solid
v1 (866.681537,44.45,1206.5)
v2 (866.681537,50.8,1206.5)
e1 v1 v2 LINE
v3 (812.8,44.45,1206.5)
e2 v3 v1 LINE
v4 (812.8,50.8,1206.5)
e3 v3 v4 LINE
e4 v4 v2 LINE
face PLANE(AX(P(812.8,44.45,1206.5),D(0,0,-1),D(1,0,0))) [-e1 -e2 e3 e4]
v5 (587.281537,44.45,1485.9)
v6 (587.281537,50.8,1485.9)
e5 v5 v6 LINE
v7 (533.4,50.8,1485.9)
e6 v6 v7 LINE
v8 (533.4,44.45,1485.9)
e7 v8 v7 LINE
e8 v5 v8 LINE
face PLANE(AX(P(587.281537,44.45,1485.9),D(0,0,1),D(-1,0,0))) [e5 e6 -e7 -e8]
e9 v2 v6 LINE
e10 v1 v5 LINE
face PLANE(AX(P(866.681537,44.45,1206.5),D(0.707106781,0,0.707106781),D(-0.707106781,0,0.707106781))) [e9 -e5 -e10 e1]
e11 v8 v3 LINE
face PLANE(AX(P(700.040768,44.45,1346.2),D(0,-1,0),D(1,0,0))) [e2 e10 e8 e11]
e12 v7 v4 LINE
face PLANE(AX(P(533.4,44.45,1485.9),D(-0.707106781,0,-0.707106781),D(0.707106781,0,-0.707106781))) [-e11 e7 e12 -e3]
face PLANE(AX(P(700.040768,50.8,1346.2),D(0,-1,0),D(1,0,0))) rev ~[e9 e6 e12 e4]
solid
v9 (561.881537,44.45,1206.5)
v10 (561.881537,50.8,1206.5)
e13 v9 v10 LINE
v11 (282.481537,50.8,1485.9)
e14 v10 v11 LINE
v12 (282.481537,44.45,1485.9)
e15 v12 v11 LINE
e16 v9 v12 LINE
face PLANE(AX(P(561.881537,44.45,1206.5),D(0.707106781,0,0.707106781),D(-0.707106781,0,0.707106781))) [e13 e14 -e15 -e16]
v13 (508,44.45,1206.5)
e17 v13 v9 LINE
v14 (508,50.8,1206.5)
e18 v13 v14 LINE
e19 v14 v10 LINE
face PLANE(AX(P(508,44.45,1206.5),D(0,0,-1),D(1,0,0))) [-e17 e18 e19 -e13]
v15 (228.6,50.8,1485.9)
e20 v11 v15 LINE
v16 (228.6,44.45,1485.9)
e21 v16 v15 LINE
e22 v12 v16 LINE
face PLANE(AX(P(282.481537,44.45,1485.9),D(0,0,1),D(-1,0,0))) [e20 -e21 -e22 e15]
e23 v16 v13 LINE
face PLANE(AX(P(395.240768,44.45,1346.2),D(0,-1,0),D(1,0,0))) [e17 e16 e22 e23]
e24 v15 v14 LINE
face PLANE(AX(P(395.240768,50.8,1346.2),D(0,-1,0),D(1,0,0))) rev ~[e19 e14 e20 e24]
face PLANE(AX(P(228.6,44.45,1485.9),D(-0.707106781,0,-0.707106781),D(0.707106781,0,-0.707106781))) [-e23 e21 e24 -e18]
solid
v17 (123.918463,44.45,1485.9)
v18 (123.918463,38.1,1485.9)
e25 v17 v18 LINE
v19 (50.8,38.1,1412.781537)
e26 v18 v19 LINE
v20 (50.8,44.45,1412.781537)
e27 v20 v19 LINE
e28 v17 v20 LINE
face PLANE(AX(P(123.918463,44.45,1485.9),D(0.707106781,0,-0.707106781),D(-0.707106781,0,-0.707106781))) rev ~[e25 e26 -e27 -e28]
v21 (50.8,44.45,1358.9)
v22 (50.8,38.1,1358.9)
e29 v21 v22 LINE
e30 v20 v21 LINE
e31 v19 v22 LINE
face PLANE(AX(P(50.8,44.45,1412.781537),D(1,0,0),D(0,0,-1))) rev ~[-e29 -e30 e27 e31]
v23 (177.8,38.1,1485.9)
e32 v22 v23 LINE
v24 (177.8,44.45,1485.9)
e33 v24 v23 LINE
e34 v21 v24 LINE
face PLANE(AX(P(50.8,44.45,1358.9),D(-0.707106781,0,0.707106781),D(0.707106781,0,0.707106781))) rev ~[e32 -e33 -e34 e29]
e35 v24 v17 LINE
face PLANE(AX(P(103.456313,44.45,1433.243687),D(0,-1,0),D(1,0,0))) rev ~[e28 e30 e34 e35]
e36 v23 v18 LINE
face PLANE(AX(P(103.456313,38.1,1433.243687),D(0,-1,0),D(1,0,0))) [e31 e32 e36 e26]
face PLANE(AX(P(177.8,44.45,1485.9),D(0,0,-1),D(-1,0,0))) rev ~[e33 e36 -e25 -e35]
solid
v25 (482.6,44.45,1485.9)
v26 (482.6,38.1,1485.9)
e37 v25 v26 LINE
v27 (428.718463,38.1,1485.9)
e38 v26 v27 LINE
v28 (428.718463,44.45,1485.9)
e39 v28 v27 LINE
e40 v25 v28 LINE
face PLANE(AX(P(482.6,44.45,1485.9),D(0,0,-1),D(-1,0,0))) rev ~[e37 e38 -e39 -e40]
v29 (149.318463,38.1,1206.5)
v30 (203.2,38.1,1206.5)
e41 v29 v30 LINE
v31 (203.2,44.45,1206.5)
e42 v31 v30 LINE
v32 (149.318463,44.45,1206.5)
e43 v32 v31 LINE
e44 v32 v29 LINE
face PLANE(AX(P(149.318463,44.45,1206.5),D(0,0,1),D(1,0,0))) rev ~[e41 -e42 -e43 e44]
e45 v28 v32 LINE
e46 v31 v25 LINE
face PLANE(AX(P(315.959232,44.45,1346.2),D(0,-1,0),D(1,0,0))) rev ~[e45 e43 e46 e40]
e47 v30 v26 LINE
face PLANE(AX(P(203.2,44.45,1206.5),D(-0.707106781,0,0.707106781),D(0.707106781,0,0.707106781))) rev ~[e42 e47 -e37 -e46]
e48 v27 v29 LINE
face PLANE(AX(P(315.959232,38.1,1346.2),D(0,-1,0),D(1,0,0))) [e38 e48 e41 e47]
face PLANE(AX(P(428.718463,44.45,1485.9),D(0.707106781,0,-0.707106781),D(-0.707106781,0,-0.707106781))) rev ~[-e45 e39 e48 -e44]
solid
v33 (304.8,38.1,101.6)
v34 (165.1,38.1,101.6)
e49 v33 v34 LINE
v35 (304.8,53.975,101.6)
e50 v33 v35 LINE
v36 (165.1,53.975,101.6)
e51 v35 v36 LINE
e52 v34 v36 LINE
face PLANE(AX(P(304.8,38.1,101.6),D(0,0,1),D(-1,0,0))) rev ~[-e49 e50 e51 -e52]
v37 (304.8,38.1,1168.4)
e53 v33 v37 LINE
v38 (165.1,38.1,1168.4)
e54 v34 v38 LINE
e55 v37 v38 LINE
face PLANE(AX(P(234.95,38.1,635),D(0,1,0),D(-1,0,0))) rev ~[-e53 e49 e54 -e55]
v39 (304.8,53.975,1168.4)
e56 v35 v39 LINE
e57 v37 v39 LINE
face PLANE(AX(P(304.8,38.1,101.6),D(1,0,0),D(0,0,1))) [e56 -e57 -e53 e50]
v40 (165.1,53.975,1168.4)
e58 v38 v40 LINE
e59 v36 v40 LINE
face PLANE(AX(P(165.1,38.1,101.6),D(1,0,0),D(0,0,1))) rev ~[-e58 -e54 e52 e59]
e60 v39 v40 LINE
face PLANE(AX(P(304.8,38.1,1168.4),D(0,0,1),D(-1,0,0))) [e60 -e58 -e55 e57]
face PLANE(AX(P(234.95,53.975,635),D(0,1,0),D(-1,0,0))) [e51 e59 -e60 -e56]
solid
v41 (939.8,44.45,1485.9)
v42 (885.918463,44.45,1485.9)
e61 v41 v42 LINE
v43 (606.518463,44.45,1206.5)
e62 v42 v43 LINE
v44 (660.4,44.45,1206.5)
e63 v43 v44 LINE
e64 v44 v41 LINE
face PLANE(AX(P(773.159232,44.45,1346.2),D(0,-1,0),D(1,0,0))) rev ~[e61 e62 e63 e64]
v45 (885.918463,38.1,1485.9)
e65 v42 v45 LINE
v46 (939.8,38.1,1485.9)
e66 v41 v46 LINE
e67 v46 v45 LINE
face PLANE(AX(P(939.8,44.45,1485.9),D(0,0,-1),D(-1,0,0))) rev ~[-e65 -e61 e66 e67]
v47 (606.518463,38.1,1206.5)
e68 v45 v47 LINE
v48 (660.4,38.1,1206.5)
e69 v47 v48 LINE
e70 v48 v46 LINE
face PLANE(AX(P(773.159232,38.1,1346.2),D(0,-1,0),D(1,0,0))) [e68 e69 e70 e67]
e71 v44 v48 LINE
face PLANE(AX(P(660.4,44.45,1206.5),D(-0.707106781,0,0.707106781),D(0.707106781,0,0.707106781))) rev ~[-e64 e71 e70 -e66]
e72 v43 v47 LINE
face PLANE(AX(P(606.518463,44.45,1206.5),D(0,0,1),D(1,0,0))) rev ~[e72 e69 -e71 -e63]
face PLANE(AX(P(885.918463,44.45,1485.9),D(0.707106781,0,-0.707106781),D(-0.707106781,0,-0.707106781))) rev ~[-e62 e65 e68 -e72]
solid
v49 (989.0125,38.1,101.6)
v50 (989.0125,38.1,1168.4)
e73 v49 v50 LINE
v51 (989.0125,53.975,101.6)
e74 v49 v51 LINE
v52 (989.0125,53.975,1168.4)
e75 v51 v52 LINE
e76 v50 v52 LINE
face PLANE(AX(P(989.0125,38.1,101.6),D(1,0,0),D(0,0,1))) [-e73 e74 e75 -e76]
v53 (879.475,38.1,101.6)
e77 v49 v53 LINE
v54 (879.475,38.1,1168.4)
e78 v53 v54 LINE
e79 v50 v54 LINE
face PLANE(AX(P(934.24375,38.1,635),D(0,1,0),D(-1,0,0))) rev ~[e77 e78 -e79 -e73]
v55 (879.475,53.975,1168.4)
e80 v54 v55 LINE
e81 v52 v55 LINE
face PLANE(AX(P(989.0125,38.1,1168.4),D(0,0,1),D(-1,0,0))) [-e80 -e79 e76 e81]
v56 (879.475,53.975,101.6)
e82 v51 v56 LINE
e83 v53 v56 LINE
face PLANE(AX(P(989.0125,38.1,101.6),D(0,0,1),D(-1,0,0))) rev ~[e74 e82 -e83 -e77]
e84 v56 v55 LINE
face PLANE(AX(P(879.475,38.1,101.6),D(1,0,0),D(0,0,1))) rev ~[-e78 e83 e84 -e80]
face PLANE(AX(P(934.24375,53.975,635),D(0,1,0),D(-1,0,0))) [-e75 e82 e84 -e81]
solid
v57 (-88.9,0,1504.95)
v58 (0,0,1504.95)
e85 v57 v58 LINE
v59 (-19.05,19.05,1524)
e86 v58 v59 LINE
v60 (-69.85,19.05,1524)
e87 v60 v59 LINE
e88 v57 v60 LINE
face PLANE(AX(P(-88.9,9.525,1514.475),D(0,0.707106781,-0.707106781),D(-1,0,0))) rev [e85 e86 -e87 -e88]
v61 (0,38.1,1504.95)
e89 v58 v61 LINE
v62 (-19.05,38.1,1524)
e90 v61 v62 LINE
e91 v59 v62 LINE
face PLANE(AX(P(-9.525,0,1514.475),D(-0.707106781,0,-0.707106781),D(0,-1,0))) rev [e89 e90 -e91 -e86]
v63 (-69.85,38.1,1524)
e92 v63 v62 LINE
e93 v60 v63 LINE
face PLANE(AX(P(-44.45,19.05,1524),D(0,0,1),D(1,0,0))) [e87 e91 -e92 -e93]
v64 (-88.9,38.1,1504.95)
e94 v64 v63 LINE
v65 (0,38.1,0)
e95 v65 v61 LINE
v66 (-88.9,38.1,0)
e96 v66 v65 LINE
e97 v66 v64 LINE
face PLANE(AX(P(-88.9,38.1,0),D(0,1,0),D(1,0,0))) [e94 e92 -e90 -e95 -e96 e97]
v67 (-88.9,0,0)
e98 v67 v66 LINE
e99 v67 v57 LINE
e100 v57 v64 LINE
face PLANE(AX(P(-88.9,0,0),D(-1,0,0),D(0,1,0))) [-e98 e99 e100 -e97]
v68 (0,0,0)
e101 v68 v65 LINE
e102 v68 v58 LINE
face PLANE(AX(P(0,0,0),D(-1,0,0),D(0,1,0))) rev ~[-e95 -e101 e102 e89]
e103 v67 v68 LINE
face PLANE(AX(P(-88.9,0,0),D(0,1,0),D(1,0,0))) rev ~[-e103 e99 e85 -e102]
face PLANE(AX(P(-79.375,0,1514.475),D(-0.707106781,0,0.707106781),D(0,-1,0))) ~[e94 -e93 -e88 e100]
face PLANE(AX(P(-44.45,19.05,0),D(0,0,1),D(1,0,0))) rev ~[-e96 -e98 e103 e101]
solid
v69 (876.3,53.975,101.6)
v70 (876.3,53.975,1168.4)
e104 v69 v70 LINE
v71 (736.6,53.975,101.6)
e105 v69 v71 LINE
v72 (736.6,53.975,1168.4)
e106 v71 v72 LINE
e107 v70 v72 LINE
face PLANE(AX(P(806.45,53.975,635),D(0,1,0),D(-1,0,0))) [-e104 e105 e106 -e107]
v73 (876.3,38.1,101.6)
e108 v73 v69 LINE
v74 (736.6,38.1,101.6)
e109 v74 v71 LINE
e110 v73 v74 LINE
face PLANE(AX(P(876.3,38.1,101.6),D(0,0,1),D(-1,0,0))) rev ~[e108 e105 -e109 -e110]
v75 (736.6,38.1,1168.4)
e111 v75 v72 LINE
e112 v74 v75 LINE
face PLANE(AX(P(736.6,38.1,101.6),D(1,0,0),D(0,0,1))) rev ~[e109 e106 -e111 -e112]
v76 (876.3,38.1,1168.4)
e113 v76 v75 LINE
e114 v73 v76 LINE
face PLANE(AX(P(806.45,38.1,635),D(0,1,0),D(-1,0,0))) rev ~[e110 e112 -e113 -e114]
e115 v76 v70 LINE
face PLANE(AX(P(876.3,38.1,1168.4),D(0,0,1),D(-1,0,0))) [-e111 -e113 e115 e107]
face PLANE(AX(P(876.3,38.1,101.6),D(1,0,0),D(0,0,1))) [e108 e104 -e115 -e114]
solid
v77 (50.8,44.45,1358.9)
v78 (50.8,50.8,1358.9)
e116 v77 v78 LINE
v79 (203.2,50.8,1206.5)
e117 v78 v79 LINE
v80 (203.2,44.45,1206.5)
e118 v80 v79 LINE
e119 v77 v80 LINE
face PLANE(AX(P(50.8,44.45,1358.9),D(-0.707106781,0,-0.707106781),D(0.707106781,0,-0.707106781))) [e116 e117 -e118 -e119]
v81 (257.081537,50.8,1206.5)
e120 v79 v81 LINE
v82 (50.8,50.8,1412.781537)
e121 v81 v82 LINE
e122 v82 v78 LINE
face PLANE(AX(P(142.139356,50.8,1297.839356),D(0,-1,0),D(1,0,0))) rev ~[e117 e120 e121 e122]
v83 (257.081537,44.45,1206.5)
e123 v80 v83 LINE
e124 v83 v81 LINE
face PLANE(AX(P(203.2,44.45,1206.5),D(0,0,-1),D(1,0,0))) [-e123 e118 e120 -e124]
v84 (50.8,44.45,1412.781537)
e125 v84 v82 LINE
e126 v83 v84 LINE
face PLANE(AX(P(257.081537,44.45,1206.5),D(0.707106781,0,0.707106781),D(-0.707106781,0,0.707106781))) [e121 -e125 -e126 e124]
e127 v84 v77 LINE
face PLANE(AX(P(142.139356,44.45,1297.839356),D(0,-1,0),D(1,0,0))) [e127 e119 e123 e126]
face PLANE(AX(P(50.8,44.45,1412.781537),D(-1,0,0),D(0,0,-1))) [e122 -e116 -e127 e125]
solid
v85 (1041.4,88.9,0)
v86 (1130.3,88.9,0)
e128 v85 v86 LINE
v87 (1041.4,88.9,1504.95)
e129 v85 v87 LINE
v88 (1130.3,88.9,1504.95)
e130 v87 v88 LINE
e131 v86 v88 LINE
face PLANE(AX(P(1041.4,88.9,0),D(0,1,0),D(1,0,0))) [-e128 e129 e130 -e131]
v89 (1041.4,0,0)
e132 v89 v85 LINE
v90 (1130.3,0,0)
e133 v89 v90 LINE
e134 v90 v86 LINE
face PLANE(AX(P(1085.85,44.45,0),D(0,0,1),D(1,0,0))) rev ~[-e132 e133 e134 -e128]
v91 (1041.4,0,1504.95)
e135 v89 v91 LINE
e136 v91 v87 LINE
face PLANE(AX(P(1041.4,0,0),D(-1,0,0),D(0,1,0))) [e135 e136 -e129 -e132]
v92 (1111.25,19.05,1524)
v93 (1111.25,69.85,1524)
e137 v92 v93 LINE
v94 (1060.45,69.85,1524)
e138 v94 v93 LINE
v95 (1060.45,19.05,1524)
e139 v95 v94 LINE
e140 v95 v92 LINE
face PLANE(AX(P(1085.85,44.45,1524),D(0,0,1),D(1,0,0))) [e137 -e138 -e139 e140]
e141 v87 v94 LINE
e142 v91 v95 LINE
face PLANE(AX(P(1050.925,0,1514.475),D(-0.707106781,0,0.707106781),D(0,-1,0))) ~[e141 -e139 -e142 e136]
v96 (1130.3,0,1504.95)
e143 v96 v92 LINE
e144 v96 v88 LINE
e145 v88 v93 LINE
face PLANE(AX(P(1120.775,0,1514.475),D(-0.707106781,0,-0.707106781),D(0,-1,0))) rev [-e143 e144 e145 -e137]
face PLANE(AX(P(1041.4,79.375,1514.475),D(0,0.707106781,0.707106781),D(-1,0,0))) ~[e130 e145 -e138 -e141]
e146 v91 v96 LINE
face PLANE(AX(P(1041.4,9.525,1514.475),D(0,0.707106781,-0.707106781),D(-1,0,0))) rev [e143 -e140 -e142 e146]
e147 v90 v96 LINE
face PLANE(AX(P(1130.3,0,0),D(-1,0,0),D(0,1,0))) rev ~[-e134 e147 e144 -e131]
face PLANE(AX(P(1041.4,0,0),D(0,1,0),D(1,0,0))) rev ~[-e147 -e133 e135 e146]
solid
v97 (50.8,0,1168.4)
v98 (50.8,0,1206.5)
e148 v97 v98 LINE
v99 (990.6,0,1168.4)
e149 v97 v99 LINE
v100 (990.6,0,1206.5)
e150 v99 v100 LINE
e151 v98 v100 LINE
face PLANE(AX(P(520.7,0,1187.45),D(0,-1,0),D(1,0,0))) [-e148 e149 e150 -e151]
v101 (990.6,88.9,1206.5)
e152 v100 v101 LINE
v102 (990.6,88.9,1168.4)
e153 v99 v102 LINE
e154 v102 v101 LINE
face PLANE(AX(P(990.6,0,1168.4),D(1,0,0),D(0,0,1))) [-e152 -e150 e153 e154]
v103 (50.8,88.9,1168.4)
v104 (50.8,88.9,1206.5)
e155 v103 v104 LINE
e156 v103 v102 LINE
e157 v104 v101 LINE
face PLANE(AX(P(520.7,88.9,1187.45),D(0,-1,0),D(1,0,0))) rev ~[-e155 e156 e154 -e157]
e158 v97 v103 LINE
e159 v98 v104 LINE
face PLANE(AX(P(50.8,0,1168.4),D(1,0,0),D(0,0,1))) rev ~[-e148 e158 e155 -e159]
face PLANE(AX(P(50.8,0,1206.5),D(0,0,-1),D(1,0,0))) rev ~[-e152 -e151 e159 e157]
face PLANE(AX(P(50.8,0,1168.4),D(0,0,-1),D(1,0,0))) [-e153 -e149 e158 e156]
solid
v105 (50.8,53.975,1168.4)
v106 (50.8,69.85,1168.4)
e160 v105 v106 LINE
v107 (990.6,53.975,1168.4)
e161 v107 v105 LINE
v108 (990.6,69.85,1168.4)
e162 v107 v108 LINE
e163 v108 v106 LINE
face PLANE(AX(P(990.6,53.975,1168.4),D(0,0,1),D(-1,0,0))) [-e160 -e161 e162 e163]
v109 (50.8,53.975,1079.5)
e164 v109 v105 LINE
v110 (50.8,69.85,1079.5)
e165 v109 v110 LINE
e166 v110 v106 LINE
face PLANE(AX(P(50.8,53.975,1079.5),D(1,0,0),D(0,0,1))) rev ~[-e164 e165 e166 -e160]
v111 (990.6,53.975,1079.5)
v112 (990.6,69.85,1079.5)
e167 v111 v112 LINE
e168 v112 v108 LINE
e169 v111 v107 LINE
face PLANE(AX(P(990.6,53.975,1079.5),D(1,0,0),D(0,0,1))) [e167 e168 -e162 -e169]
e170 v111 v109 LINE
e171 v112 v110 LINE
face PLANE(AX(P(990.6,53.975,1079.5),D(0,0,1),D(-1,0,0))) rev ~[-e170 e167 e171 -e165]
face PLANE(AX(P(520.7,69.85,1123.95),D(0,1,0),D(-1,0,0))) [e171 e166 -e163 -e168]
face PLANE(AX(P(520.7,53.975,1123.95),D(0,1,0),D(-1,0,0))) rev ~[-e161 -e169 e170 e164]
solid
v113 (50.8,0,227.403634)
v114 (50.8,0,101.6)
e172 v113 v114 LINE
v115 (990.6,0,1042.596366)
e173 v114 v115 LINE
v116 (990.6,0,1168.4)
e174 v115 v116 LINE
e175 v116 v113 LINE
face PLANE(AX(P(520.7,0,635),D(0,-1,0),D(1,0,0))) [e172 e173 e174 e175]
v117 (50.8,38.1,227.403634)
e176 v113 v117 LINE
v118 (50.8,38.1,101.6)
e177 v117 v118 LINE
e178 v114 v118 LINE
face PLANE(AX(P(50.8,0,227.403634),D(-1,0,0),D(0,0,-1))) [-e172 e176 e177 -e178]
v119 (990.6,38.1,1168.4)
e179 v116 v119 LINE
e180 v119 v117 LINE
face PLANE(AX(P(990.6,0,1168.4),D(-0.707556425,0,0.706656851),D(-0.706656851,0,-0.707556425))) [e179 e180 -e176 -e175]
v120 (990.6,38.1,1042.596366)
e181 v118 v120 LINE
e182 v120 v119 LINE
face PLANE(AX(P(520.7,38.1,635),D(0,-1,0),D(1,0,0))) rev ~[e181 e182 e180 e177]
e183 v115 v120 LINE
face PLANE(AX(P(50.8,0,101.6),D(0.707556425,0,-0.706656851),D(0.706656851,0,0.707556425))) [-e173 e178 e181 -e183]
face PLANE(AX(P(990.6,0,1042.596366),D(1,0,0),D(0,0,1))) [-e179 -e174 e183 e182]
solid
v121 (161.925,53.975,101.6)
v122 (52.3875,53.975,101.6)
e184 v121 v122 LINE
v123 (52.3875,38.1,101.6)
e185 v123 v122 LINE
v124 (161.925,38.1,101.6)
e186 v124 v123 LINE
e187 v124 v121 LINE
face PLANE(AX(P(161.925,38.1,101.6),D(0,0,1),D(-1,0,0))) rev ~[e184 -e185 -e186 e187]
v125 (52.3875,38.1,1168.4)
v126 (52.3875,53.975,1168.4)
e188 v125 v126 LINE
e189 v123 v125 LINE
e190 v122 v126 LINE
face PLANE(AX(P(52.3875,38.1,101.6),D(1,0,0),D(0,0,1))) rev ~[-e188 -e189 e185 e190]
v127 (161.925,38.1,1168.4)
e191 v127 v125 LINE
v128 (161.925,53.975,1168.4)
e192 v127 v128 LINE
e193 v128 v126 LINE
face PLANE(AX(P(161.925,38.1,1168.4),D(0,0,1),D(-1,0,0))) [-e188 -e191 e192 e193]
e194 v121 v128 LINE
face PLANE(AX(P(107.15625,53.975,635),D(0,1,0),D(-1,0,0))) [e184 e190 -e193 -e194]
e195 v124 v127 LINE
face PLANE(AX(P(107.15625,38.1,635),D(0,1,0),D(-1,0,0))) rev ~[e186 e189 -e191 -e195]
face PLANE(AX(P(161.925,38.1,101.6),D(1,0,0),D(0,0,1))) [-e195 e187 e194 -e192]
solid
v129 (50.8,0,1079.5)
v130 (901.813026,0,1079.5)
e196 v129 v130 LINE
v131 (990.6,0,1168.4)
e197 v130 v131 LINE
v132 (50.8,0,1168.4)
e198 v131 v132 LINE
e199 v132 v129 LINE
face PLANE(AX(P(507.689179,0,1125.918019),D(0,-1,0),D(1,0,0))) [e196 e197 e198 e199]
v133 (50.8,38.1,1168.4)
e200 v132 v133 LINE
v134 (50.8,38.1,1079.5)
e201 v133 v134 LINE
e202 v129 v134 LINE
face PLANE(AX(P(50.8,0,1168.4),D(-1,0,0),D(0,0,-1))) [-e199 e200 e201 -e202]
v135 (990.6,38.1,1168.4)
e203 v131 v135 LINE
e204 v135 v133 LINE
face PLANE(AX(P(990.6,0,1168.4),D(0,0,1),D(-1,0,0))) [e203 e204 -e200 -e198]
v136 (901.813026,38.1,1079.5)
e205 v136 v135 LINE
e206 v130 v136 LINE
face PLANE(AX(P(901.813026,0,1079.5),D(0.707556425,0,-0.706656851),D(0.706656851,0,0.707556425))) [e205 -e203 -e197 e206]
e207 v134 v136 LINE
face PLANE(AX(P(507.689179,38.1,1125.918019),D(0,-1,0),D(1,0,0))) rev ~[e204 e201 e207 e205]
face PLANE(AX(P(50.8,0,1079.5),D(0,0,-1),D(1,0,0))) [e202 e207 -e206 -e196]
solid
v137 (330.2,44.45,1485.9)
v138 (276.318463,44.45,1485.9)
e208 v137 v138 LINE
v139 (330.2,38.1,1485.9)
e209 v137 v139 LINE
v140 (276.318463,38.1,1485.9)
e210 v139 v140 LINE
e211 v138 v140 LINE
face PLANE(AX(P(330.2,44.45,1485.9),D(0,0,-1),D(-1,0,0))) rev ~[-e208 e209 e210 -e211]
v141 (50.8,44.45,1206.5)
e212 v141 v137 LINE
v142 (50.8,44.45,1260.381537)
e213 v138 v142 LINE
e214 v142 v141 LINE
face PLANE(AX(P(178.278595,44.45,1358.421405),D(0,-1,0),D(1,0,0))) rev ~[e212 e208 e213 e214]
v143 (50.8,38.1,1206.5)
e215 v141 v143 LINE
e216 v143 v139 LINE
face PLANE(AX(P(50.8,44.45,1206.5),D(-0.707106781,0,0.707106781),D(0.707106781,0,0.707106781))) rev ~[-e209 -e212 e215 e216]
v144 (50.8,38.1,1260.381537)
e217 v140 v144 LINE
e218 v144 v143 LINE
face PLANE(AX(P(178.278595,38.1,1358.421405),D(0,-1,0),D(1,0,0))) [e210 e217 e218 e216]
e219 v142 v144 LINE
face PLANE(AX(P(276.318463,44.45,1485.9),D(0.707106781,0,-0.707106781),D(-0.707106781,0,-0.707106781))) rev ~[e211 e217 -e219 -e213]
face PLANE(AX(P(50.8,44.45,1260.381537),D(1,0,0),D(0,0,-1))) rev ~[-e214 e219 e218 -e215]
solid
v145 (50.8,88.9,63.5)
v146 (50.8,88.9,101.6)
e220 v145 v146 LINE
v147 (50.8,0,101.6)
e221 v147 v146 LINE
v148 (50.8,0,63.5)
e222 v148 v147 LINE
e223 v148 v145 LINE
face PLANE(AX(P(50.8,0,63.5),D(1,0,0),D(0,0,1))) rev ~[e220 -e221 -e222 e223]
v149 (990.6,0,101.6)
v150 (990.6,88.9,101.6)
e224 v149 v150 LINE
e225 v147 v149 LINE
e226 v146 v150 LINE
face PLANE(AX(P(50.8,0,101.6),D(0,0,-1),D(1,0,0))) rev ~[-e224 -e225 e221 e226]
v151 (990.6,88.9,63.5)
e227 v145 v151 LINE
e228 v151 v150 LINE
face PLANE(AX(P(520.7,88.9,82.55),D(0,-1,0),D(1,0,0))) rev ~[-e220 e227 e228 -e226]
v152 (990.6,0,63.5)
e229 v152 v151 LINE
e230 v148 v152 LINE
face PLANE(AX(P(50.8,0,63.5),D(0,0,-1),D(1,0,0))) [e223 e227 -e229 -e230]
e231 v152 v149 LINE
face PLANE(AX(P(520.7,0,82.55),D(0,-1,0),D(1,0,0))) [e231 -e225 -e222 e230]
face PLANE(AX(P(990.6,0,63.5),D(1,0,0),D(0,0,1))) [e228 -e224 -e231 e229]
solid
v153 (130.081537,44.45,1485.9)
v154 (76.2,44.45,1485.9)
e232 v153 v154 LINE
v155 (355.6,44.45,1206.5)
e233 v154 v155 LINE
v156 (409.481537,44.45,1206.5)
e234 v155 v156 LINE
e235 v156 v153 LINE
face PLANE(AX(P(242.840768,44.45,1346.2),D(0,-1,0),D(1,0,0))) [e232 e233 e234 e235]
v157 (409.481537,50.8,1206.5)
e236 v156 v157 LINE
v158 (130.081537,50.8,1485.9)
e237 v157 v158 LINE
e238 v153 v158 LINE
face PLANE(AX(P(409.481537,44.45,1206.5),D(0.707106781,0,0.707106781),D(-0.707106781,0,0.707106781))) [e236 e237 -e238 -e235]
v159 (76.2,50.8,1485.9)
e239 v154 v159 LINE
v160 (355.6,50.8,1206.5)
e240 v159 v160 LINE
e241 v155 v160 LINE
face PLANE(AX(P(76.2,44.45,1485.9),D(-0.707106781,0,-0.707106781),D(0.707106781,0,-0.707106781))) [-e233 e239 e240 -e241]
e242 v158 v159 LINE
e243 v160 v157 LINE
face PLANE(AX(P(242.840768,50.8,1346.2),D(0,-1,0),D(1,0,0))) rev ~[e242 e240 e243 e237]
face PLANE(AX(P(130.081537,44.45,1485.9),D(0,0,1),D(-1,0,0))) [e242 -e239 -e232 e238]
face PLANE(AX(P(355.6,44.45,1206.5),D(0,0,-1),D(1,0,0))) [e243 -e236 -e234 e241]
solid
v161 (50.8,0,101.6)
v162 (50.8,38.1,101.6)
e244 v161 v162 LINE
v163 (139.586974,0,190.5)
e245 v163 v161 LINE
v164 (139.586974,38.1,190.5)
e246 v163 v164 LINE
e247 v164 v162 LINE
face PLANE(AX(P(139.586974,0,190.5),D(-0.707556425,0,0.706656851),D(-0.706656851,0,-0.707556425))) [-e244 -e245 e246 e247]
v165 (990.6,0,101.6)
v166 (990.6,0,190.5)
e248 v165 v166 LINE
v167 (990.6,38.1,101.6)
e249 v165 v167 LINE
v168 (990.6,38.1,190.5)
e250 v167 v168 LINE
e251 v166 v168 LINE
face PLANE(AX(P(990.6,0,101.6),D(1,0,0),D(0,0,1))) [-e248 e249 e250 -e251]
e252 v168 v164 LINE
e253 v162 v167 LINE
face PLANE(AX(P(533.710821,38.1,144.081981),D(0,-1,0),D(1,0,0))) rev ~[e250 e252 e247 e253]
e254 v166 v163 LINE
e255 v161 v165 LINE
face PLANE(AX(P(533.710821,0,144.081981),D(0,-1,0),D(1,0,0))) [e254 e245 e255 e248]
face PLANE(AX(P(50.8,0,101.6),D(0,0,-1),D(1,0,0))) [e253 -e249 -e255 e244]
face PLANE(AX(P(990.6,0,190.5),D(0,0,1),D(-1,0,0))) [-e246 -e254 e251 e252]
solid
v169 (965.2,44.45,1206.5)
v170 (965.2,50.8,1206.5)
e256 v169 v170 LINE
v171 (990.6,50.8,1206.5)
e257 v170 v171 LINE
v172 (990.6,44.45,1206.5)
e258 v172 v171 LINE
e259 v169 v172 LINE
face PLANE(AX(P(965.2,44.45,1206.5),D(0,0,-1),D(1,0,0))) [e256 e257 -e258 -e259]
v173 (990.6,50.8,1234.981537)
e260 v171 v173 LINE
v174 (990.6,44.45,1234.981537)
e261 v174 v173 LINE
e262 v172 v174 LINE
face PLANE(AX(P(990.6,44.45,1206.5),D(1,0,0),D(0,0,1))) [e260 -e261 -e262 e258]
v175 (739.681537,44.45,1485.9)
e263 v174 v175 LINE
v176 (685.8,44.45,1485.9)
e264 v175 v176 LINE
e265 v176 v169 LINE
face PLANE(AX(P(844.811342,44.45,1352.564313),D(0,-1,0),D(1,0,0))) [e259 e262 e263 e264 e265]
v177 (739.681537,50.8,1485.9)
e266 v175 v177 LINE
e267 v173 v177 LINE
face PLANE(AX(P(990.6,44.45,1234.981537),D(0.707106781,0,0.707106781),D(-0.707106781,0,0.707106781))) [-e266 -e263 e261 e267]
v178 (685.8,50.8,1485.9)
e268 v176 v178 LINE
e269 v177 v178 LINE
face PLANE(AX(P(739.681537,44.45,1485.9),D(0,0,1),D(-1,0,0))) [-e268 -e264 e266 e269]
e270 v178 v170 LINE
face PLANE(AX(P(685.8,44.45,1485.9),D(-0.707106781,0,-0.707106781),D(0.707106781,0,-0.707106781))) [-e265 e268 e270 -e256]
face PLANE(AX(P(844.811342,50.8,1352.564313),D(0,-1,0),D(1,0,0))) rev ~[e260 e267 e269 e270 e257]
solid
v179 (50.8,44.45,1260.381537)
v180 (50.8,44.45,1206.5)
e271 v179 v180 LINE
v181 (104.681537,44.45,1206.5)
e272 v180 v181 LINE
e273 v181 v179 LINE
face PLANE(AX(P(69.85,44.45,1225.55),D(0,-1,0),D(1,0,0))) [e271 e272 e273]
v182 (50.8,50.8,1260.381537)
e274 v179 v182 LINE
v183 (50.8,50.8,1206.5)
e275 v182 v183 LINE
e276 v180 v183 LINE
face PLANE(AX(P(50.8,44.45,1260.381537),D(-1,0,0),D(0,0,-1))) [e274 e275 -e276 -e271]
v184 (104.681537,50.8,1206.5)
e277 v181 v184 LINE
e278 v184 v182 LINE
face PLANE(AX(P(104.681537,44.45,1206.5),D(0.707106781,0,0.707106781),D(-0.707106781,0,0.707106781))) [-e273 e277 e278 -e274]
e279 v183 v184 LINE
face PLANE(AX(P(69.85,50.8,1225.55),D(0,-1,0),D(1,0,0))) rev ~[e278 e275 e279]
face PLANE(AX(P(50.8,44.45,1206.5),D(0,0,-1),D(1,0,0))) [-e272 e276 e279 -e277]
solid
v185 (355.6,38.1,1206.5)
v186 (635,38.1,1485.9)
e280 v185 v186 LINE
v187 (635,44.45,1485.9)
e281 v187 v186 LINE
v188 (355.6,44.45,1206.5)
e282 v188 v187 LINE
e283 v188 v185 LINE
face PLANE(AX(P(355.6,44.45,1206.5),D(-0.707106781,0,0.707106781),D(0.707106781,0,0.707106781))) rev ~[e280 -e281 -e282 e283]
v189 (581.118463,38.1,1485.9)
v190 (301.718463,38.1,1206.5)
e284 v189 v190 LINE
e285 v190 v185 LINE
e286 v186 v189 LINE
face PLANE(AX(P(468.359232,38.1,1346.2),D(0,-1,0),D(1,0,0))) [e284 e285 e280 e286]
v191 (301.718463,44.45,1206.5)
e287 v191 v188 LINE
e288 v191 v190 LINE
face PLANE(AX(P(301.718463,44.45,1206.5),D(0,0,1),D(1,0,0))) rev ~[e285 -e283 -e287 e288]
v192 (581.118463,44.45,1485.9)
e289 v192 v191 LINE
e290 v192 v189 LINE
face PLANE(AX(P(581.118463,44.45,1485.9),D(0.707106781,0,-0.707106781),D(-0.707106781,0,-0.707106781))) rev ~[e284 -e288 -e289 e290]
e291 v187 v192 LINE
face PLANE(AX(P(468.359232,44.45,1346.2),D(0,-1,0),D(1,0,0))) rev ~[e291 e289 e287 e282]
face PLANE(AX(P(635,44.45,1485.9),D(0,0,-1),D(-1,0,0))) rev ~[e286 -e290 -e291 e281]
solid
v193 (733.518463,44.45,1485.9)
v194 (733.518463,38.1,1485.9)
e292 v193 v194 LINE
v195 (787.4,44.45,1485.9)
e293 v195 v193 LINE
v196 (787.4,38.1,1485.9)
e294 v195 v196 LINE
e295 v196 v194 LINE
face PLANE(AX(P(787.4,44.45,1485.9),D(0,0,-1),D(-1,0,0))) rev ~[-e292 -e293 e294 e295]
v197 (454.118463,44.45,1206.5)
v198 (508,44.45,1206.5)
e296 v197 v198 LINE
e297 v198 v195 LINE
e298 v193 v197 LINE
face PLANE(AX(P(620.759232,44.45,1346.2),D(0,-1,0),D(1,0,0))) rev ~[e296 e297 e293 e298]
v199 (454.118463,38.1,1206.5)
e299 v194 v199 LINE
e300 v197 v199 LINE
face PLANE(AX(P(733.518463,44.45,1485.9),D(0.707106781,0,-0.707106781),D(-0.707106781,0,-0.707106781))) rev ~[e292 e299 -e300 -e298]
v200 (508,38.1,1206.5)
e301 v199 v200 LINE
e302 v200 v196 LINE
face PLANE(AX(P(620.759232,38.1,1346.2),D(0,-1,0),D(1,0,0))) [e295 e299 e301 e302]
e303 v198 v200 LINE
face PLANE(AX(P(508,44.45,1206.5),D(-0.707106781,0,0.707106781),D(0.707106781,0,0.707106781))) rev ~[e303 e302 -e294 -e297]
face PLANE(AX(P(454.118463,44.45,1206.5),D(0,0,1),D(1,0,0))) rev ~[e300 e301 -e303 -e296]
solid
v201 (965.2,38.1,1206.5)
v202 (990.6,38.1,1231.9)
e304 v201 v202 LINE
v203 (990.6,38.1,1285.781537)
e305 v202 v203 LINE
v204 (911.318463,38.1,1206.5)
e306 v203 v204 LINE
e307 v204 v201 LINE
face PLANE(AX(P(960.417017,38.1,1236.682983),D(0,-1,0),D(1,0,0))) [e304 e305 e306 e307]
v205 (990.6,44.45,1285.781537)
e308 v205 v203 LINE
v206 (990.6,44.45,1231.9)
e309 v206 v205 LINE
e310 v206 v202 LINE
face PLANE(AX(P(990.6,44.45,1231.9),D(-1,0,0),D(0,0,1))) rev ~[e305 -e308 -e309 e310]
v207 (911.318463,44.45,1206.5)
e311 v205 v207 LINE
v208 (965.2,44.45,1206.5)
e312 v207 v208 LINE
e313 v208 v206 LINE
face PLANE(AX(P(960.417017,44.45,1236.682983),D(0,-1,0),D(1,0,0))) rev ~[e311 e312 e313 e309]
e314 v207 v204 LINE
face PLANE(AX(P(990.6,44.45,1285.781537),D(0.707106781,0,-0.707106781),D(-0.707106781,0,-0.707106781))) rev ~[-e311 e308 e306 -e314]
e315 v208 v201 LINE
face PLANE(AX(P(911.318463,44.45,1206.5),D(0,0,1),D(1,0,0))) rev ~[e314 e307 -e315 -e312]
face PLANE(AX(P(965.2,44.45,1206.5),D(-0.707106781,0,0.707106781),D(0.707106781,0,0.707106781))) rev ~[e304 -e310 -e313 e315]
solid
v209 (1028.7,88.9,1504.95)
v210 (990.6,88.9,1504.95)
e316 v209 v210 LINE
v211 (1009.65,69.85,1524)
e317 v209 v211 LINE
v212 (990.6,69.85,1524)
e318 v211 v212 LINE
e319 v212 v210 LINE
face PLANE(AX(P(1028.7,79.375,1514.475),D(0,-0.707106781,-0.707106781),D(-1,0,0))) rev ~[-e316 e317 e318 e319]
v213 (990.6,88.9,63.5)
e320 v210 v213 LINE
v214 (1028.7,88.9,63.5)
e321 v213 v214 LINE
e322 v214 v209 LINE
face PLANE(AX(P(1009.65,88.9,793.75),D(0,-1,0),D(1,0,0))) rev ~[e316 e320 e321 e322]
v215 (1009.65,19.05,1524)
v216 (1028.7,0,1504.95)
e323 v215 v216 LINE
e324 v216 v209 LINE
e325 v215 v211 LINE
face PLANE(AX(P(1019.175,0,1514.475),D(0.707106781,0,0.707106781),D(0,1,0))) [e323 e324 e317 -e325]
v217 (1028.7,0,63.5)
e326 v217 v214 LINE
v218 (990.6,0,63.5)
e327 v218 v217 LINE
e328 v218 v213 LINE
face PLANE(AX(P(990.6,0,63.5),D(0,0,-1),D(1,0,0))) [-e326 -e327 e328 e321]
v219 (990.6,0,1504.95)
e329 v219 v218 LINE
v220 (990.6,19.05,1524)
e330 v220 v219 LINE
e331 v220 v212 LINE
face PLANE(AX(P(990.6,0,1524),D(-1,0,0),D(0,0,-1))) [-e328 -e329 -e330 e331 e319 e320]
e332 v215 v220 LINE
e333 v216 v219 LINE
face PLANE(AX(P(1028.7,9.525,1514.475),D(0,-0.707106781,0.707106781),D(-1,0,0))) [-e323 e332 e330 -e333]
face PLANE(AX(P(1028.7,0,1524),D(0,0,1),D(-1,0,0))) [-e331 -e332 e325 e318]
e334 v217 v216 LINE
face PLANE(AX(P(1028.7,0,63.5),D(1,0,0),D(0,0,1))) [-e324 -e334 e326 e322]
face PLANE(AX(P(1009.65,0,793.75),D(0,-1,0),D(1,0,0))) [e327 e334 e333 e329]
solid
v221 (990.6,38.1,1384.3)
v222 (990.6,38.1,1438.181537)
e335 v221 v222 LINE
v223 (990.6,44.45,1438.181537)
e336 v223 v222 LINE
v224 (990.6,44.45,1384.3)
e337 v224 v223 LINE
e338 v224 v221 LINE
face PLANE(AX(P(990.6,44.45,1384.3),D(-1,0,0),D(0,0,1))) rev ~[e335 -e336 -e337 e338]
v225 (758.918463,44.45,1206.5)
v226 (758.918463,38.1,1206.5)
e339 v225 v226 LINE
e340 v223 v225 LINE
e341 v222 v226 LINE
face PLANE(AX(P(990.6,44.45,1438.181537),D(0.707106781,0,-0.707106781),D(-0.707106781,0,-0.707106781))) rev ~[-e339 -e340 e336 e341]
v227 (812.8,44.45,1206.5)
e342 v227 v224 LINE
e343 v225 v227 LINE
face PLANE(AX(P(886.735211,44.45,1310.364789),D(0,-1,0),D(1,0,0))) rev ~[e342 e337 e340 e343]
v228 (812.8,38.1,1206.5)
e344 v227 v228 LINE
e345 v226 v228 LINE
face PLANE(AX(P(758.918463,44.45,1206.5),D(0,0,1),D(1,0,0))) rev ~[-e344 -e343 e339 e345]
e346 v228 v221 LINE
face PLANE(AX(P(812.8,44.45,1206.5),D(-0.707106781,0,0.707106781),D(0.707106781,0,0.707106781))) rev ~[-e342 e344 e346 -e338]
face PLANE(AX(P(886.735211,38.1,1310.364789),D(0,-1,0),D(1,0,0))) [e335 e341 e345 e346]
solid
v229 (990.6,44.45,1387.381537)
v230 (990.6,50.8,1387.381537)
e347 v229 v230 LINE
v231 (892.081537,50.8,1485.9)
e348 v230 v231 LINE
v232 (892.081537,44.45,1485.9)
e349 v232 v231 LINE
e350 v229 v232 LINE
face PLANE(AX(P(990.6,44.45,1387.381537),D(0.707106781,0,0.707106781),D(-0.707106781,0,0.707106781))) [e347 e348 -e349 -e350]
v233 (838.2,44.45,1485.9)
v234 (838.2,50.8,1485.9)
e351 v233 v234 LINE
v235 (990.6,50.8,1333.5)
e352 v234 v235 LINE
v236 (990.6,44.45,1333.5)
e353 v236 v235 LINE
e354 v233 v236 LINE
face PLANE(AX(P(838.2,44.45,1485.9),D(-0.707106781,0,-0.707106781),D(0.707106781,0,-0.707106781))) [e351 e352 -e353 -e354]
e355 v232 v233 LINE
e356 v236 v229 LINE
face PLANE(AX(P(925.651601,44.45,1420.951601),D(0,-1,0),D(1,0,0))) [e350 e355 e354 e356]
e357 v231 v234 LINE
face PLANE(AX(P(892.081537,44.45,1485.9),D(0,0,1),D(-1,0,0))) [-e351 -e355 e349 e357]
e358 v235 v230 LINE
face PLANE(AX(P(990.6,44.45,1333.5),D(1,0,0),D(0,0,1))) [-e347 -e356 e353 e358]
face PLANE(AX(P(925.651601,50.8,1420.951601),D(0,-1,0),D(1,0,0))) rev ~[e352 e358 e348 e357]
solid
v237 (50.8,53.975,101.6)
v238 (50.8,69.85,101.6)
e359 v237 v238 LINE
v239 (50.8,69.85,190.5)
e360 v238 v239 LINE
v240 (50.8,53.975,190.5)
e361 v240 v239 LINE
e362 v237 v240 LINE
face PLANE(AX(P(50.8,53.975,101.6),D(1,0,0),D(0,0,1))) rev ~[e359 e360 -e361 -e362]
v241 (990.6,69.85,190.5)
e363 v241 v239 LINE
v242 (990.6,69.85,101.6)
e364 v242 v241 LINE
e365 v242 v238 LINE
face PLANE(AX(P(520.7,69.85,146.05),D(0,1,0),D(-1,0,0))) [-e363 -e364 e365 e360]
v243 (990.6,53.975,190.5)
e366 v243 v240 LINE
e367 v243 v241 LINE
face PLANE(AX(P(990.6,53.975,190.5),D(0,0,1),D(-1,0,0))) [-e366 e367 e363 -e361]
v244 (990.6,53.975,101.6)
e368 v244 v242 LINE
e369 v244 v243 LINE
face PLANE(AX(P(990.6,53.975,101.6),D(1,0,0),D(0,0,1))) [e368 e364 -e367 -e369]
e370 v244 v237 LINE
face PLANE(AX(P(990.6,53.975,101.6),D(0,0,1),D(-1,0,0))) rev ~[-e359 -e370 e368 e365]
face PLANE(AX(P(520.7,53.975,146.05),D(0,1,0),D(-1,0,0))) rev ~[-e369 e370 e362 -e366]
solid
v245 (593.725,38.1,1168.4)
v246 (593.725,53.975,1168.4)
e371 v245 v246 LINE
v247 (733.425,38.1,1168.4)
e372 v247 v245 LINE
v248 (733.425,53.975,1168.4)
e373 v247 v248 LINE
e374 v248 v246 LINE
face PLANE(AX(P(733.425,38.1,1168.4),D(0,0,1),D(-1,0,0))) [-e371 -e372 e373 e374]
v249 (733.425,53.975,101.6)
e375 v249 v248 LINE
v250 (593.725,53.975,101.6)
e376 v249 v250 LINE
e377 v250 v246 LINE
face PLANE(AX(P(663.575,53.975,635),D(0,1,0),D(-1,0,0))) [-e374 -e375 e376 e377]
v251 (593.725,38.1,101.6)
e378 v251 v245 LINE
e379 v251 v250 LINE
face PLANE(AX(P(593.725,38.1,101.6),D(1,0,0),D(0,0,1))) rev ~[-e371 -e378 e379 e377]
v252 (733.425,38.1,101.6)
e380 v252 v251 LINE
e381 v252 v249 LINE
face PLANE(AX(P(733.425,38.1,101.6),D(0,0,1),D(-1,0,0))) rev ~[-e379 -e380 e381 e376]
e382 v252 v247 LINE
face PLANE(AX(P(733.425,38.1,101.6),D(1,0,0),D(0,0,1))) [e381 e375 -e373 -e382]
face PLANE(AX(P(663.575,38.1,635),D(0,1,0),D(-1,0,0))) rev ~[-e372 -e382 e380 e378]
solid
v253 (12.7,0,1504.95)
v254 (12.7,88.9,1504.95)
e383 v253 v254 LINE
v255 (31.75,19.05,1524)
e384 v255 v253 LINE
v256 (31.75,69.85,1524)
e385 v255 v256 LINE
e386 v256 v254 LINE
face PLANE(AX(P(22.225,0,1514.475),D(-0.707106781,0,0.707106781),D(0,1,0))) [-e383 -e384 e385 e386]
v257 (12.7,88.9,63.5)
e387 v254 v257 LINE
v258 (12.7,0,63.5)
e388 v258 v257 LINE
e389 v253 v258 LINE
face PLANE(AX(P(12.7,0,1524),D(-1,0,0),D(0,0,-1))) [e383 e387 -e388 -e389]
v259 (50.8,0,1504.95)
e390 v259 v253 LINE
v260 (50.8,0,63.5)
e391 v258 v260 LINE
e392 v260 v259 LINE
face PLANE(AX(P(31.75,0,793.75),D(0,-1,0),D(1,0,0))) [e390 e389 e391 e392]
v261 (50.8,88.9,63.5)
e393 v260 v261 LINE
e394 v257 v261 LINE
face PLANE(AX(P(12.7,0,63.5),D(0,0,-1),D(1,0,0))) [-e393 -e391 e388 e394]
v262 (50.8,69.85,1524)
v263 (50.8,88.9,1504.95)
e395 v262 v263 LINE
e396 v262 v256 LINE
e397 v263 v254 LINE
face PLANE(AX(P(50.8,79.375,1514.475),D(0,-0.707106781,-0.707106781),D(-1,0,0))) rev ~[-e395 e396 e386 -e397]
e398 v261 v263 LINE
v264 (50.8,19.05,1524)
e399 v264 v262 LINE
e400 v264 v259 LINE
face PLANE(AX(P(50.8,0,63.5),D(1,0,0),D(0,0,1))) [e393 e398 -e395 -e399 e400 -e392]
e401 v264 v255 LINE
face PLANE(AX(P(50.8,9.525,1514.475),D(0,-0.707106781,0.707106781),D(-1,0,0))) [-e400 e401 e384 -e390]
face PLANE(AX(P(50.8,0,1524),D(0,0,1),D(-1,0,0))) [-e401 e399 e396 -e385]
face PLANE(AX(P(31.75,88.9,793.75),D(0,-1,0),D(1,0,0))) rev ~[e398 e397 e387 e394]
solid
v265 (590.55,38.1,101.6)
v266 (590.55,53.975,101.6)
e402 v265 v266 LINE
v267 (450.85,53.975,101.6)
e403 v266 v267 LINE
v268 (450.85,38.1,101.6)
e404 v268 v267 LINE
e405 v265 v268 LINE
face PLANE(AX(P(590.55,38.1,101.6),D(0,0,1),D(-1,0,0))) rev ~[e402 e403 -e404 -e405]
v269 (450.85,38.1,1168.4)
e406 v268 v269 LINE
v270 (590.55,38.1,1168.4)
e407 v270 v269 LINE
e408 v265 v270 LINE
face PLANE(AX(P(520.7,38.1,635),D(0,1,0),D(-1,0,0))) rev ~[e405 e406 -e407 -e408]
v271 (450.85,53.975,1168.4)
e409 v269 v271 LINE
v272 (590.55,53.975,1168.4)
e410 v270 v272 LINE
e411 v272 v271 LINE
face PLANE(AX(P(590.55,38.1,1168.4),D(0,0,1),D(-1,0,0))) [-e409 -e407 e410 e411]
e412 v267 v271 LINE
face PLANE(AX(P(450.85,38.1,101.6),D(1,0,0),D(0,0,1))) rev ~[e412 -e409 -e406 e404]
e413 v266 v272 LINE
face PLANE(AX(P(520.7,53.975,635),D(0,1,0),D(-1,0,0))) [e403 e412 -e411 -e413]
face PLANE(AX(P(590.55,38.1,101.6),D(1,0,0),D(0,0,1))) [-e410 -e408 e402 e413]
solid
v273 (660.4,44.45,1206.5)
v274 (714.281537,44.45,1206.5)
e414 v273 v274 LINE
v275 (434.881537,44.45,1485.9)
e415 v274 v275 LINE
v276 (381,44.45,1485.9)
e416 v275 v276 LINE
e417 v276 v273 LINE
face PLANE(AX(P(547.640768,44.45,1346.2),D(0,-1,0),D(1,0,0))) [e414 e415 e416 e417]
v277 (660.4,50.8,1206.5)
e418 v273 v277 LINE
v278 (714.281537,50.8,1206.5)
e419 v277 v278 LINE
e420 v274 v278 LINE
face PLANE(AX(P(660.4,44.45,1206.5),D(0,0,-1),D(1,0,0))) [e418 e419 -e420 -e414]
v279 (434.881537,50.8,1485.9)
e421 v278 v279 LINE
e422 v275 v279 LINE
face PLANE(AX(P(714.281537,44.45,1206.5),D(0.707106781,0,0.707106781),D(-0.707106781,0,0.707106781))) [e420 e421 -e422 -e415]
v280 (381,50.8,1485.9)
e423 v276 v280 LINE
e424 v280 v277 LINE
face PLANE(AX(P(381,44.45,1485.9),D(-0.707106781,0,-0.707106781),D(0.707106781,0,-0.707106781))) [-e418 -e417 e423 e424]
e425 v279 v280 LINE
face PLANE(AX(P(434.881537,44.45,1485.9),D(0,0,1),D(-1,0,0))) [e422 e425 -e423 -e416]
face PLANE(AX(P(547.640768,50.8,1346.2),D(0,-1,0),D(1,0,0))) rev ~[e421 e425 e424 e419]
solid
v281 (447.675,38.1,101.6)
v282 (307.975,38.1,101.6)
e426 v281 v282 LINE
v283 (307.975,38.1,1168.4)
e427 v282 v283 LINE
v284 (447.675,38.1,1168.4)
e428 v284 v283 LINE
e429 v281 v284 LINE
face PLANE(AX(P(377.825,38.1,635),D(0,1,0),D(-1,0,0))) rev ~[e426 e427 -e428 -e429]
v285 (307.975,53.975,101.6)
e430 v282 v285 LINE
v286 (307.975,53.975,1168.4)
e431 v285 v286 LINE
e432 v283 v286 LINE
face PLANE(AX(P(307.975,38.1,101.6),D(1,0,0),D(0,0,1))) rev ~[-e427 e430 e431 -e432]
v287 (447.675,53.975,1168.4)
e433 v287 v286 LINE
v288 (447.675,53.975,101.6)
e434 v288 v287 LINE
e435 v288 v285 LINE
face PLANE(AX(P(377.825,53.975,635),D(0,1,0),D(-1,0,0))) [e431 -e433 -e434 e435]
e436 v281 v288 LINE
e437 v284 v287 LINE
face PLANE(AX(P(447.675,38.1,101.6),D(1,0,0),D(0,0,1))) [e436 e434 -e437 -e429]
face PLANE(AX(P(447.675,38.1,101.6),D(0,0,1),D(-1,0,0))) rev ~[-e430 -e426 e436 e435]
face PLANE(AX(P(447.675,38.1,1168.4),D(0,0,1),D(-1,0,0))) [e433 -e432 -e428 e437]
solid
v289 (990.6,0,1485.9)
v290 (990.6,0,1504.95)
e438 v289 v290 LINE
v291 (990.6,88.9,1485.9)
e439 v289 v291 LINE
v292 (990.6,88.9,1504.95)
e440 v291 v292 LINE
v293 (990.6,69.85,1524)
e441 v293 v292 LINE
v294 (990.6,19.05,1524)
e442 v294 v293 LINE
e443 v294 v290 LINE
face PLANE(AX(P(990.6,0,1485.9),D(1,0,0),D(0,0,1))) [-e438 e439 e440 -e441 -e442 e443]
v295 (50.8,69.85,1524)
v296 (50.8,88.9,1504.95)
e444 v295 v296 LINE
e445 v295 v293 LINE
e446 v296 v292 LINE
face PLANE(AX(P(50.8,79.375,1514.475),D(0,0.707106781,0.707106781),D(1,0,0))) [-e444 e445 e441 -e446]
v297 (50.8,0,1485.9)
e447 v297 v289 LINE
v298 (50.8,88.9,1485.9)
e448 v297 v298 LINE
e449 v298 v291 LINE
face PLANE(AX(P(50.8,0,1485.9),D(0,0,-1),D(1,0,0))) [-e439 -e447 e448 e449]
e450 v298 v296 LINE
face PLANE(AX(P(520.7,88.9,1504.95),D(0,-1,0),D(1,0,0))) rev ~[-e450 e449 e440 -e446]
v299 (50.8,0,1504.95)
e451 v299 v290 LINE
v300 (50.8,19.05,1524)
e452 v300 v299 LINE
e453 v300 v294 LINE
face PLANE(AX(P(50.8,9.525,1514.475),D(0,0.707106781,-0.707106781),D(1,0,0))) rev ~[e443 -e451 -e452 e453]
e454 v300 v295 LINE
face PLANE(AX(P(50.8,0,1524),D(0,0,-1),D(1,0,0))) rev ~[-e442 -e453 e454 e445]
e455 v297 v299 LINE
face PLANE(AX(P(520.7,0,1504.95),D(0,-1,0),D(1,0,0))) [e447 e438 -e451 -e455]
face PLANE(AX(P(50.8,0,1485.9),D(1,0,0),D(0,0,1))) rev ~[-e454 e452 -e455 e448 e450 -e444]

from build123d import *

# Parameters (mm, degrees)
F0_W       = 88.9
F0_H       = 88.9
F1_DEPTH   = 1524
F0_H_2     = 38.1
F3_DEPTH   = 88.9
F4_W       = 939.8
F4_H       = 38.1
F5_DEPTH   = 88.9
F7_DEPTH   = 38.1
F9_DEPTH   = 38.1
F10_W      = 139.7
F10_H      = 1066.8
F11_DEPTH  = 15.875
F10_W_2    = 109.5375
F12_W      = 939.8
F12_H      = 88.9
F13_DEPTH  = 15.875
F16_DEPTH  = 6.35
F18_DEPTH  = 6.35
F19_SIZE   = 19.05
F19_2_SIZE = 19.05
F19_3_SIZE = 19.05
F19_4_SIZE = 19.05
F19_5_SIZE = 19.05


with BuildPart() as f1:
    # F0 (on Top) → F1 (new body)
    with BuildSketch(Plane.XY):
        with Locations((1085.85, 44.45)):
            Rectangle(F0_W, F0_H)
    extrude(amount=F1_DEPTH)

    # F19
    f19_edges = [f1.edges().sort_by_distance(p)[0] for p in [
        (1041.4, 44.45, 1524),
        (1085.85, 0, 1524),
        (1130.3, 44.45, 1524),
        (1085.85, 88.9, 1524),
    ]]
    chamfer(f19_edges, length=F19_SIZE)


with BuildPart() as f1b:
    # F0 (on Top) → F1, piece 2 (new body)
    with BuildSketch(Plane.XY):
        with Locations((-44.45, 19.05)):
            Rectangle(F0_W, F0_H_2)
    extrude(amount=F1_DEPTH)

    # F19#2
    f19_2_edges = [f1b.edges().sort_by_distance(p)[0] for p in [
        (-44.45, 0, 1524),
        (0, 19.05, 1524),
        (-88.9, 19.05, 1524),
    ]]
    chamfer(f19_2_edges, length=F19_2_SIZE)


with BuildPart() as f3:
    # F2 (on face) → F3 (new body)
    with BuildSketch(Plane.XZ):
        Polygon((1028.7, 63.5), (1028.7, 1524), (990.6, 1524), (990.6, 1485.9), (990.6, 1206.5), (990.6, 1168.4), (990.6, 101.6), (990.6, 63.5), align=None)
    extrude(amount=-F3_DEPTH)

    # F19#3
    f19_3_edges = [f3.edges().sort_by_distance(p)[0] for p in [
        (1009.65, 0, 1524),
        (1028.7, 44.45, 1524),
        (1009.65, 88.9, 1524),
    ]]
    chamfer(f19_3_edges, length=F19_3_SIZE)


with BuildPart() as f3b:
    # F2 (on face) → F3, piece 2 (new body)
    with BuildSketch(Plane.XZ):
        Polygon((50.8, 1485.9), (50.8, 1524), (12.7, 1524), (12.7, 63.5), (50.8, 63.5), (50.8, 101.6), (50.8, 1168.4), (50.8, 1206.5), align=None)
    extrude(amount=-F3_DEPTH)

    # F19#4
    f19_4_edges = [f3b.edges().sort_by_distance(p)[0] for p in [
        (31.75, 0, 1524),
        (12.7, 44.45, 1524),
        (31.75, 88.9, 1524),
    ]]
    chamfer(f19_4_edges, length=F19_4_SIZE)


with BuildPart() as f5:
    # F4 (on face) → F5 (new body)
    with BuildSketch(Plane.XZ):
        with Locations((520.7, 1504.95)):
            Rectangle(F4_W, F4_H)
    extrude(amount=-F5_DEPTH)

    # F19#5
    f19_5_edges = [f5.edges().sort_by_distance(p)[0] for p in [
        (520.7, 0, 1524),
        (520.7, 88.9, 1524),
    ]]
    chamfer(f19_5_edges, length=F19_5_SIZE)


with BuildPart() as f5b:
    # F4 (on face) → F5, piece 2 (new body)
    with BuildSketch(Plane.XZ):
        with Locations((520.7, 1187.45)):
            Rectangle(F4_W, F4_H)
    extrude(amount=-F5_DEPTH)


with BuildPart() as f5c:
    # F4 (on face) → F5, piece 3 (new body)
    with BuildSketch(Plane.XZ):
        with Locations((520.7, 82.55)):
            Rectangle(F4_W, F4_H)
    extrude(amount=-F5_DEPTH)


with BuildPart() as f7:
    # F6 (on face) → F7 (new body)
    with BuildSketch(Plane.XZ):
        Polygon((990.6, 1042.596365767), (990.6, 1168.4), (50.8, 227.403634233), (50.8, 101.6), align=None)
    extrude(amount=-F7_DEPTH)


with BuildPart() as f9:
    # F8 (on face) → F9 (new body)
    with BuildSketch(Plane.XZ):
        Polygon((990.6, 1168.4), (50.8, 1168.4), (50.8, 1079.5), (901.8130258528, 1079.5), align=None)
    extrude(amount=-F9_DEPTH)


with BuildPart() as f9b:
    # F8 (on face) → F9, piece 2 (new body)
    with BuildSketch(Plane.XZ):
        Polygon((50.8, 101.6), (990.6, 101.6), (990.6, 190.5), (139.5869741472, 190.5), align=None)
    extrude(amount=-F9_DEPTH)


with BuildPart() as f11:
    # F10 (on face) → F11 (new body)
    with BuildSketch(Plane(origin=(0, 38.1, 0), x_dir=(-1, 0, 0), z_dir=(0, 1, 0))):
        with Locations((-520.7, 635)):
            Rectangle(F10_W, F10_H)
    extrude(amount=F11_DEPTH)


with BuildPart() as f11b:
    # F10 (on face) → F11, piece 2 (new body)
    with BuildSketch(Plane(origin=(0, 38.1, 0), x_dir=(-1, 0, 0), z_dir=(0, 1, 0))):
        with Locations((-377.825, 635)):
            Rectangle(F10_W, F10_H)
    extrude(amount=F11_DEPTH)


with BuildPart() as f11c:
    # F10 (on face) → F11, piece 3 (new body)
    with BuildSketch(Plane(origin=(0, 38.1, 0), x_dir=(-1, 0, 0), z_dir=(0, 1, 0))):
        with Locations((-234.95, 635)):
            Rectangle(F10_W, F10_H)
    extrude(amount=F11_DEPTH)


with BuildPart() as f11d:
    # F10 (on face) → F11, piece 4 (new body)
    with BuildSketch(Plane(origin=(0, 38.1, 0), x_dir=(-1, 0, 0), z_dir=(0, 1, 0))):
        with Locations((-107.15625, 635)):
            Rectangle(F10_W_2, F10_H)
    extrude(amount=F11_DEPTH)


with BuildPart() as f11e:
    # F10 (on face) → F11, piece 5 (new body)
    with BuildSketch(Plane(origin=(0, 38.1, 0), x_dir=(-1, 0, 0), z_dir=(0, 1, 0))):
        with Locations((-806.45, 635)):
            Rectangle(F10_W, F10_H)
    extrude(amount=F11_DEPTH)


with BuildPart() as f11f:
    # F10 (on face) → F11, piece 6 (new body)
    with BuildSketch(Plane(origin=(0, 38.1, 0), x_dir=(-1, 0, 0), z_dir=(0, 1, 0))):
        with Locations((-934.24375, 635)):
            Rectangle(F10_W_2, F10_H)
    extrude(amount=F11_DEPTH)


with BuildPart() as f11g:
    # F10 (on face) → F11, piece 7 (new body)
    with BuildSketch(Plane(origin=(0, 38.1, 0), x_dir=(-1, 0, 0), z_dir=(0, 1, 0))):
        with Locations((-663.575, 635)):
            Rectangle(F10_W, F10_H)
    extrude(amount=F11_DEPTH)


with BuildPart() as f13:
    # F12 (on face) → F13 (new body)
    with BuildSketch(Plane(origin=(0, 53.975, 0), x_dir=(-1, 0, 0), z_dir=(0, 1, 0))):
        with Locations((-520.7, 1123.95)):
            Rectangle(F12_W, F12_H)
    extrude(amount=F13_DEPTH)


with BuildPart() as f13b:
    # F12 (on face) → F13, piece 2 (new body)
    with BuildSketch(Plane(origin=(0, 53.975, 0), x_dir=(-1, 0, 0), z_dir=(0, 1, 0))):
        with Locations((-520.7, 146.05)):
            Rectangle(F12_W, F12_H)
    extrude(amount=F13_DEPTH)


with BuildPart() as f16:
    # F15 (on offset) → F16 (new body)
    with BuildSketch(Plane.XZ.offset(-44.45)):
        Polygon((177.8, 1485.9), (123.9184632736, 1485.9), (50.8, 1412.7815367264), (50.8, 1358.9), align=None)
    extrude(amount=F16_DEPTH)


with BuildPart() as f16b:
    # F15 (on offset) → F16, piece 2 (new body)
    with BuildSketch(Plane.XZ.offset(-44.45)):
        Polygon((990.6, 1384.3), (990.6, 1438.1815367264), (758.9184632736, 1206.5), (812.8, 1206.5), align=None)
    extrude(amount=F16_DEPTH)


with BuildPart() as f16c:
    # F15 (on offset) → F16, piece 3 (new body)
    with BuildSketch(Plane.XZ.offset(-44.45)):
        Polygon((50.8, 1260.3815367264), (50.8, 1206.5), (330.2, 1485.9), (276.3184632736, 1485.9), align=None)
    extrude(amount=F16_DEPTH)


with BuildPart() as f16d:
    # F15 (on offset) → F16, piece 4 (new body)
    with BuildSketch(Plane.XZ.offset(-44.45)):
        Polygon((149.3184632736, 1206.5), (203.2, 1206.5), (482.6, 1485.9), (428.7184632736, 1485.9), align=None)
    extrude(amount=F16_DEPTH)


with BuildPart() as f16e:
    # F15 (on offset) → F16, piece 5 (new body)
    with BuildSketch(Plane.XZ.offset(-44.45)):
        Polygon((301.7184632736, 1206.5), (355.6, 1206.5), (635, 1485.9), (581.1184632736, 1485.9), align=None)
    extrude(amount=F16_DEPTH)


with BuildPart() as f16f:
    # F15 (on offset) → F16, piece 6 (new body)
    with BuildSketch(Plane.XZ.offset(-44.45)):
        Polygon((454.1184632736, 1206.5), (508, 1206.5), (787.4, 1485.9), (733.5184632736, 1485.9), align=None)
    extrude(amount=F16_DEPTH)


with BuildPart() as f16g:
    # F15 (on offset) → F16, piece 7 (new body)
    with BuildSketch(Plane.XZ.offset(-44.45)):
        Polygon((606.5184632736, 1206.5), (660.4, 1206.5), (939.8, 1485.9), (885.9184632736, 1485.9), align=None)
    extrude(amount=F16_DEPTH)


with BuildPart() as f16h:
    # F15 (on offset) → F16, piece 8 (new body)
    with BuildSketch(Plane.XZ.offset(-44.45)):
        Polygon((911.3184632736, 1206.5), (965.2, 1206.5), (990.6, 1231.9), (990.6, 1285.7815367264), align=None)
    extrude(amount=F16_DEPTH)


with BuildPart() as f18:
    # F17 (on offset) → F18 (new body)
    with BuildSketch(Plane.XZ.offset(-44.45)):
        Polygon((104.6815367264, 1206.5), (50.8, 1260.3815367264), (50.8, 1206.5), align=None)
    extrude(amount=-F18_DEPTH)


with BuildPart() as f18b:
    # F17 (on offset) → F18, piece 2 (new body)
    with BuildSketch(Plane.XZ.offset(-44.45)):
        Polygon((257.0815367264, 1206.5), (50.8, 1412.7815367264), (50.8, 1358.9), (203.2, 1206.5), align=None)
    extrude(amount=-F18_DEPTH)


with BuildPart() as f18c:
    # F17 (on offset) → F18, piece 3 (new body)
    with BuildSketch(Plane.XZ.offset(-44.45)):
        Polygon((409.4815367264, 1206.5), (130.0815367264, 1485.9), (76.2, 1485.9), (355.6, 1206.5), align=None)
    extrude(amount=-F18_DEPTH)


with BuildPart() as f18d:
    # F17 (on offset) → F18, piece 4 (new body)
    with BuildSketch(Plane.XZ.offset(-44.45)):
        Polygon((561.8815367264, 1206.5), (282.4815367264, 1485.9), (228.6, 1485.9), (508, 1206.5), align=None)
    extrude(amount=-F18_DEPTH)


with BuildPart() as f18e:
    # F17 (on offset) → F18, piece 5 (new body)
    with BuildSketch(Plane.XZ.offset(-44.45)):
        Polygon((714.2815367264, 1206.5), (434.8815367264, 1485.9), (381, 1485.9), (660.4, 1206.5), align=None)
    extrude(amount=-F18_DEPTH)


with BuildPart() as f18f:
    # F17 (on offset) → F18, piece 6 (new body)
    with BuildSketch(Plane.XZ.offset(-44.45)):
        Polygon((866.6815367264, 1206.5), (587.2815367264, 1485.9), (533.4, 1485.9), (812.8, 1206.5), align=None)
    extrude(amount=-F18_DEPTH)


with BuildPart() as f18g:
    # F17 (on offset) → F18, piece 7 (new body)
    with BuildSketch(Plane.XZ.offset(-44.45)):
        Polygon((990.6, 1234.9815367264), (739.6815367264, 1485.9), (685.8, 1485.9), (965.2, 1206.5), (990.6, 1206.5), align=None)
    extrude(amount=-F18_DEPTH)


with BuildPart() as f18h:
    # F17 (on offset) → F18, piece 8 (new body)
    with BuildSketch(Plane.XZ.offset(-44.45)):
        Polygon((990.6, 1387.3815367264), (892.0815367264, 1485.9), (838.2, 1485.9), (990.6, 1333.5), align=None)
    extrude(amount=-F18_DEPTH)


solid = Compound([f1.part, f1b.part, f3.part, f3b.part, f5.part, f5b.part, f5c.part, f7.part, f9.part, f9b.part, f11.part, f11b.part, f11c.part, f11d.part, f11e.part, f11f.part, f11g.part, f13.part, f13b.part, f16.part, f16b.part, f16c.part, f16d.part, f16e.part, f16f.part, f16g.part, f16h.part, f18.part, f18b.part, f18c.part, f18d.part, f18e.part, f18f.part, f18g.part, f18h.part])
